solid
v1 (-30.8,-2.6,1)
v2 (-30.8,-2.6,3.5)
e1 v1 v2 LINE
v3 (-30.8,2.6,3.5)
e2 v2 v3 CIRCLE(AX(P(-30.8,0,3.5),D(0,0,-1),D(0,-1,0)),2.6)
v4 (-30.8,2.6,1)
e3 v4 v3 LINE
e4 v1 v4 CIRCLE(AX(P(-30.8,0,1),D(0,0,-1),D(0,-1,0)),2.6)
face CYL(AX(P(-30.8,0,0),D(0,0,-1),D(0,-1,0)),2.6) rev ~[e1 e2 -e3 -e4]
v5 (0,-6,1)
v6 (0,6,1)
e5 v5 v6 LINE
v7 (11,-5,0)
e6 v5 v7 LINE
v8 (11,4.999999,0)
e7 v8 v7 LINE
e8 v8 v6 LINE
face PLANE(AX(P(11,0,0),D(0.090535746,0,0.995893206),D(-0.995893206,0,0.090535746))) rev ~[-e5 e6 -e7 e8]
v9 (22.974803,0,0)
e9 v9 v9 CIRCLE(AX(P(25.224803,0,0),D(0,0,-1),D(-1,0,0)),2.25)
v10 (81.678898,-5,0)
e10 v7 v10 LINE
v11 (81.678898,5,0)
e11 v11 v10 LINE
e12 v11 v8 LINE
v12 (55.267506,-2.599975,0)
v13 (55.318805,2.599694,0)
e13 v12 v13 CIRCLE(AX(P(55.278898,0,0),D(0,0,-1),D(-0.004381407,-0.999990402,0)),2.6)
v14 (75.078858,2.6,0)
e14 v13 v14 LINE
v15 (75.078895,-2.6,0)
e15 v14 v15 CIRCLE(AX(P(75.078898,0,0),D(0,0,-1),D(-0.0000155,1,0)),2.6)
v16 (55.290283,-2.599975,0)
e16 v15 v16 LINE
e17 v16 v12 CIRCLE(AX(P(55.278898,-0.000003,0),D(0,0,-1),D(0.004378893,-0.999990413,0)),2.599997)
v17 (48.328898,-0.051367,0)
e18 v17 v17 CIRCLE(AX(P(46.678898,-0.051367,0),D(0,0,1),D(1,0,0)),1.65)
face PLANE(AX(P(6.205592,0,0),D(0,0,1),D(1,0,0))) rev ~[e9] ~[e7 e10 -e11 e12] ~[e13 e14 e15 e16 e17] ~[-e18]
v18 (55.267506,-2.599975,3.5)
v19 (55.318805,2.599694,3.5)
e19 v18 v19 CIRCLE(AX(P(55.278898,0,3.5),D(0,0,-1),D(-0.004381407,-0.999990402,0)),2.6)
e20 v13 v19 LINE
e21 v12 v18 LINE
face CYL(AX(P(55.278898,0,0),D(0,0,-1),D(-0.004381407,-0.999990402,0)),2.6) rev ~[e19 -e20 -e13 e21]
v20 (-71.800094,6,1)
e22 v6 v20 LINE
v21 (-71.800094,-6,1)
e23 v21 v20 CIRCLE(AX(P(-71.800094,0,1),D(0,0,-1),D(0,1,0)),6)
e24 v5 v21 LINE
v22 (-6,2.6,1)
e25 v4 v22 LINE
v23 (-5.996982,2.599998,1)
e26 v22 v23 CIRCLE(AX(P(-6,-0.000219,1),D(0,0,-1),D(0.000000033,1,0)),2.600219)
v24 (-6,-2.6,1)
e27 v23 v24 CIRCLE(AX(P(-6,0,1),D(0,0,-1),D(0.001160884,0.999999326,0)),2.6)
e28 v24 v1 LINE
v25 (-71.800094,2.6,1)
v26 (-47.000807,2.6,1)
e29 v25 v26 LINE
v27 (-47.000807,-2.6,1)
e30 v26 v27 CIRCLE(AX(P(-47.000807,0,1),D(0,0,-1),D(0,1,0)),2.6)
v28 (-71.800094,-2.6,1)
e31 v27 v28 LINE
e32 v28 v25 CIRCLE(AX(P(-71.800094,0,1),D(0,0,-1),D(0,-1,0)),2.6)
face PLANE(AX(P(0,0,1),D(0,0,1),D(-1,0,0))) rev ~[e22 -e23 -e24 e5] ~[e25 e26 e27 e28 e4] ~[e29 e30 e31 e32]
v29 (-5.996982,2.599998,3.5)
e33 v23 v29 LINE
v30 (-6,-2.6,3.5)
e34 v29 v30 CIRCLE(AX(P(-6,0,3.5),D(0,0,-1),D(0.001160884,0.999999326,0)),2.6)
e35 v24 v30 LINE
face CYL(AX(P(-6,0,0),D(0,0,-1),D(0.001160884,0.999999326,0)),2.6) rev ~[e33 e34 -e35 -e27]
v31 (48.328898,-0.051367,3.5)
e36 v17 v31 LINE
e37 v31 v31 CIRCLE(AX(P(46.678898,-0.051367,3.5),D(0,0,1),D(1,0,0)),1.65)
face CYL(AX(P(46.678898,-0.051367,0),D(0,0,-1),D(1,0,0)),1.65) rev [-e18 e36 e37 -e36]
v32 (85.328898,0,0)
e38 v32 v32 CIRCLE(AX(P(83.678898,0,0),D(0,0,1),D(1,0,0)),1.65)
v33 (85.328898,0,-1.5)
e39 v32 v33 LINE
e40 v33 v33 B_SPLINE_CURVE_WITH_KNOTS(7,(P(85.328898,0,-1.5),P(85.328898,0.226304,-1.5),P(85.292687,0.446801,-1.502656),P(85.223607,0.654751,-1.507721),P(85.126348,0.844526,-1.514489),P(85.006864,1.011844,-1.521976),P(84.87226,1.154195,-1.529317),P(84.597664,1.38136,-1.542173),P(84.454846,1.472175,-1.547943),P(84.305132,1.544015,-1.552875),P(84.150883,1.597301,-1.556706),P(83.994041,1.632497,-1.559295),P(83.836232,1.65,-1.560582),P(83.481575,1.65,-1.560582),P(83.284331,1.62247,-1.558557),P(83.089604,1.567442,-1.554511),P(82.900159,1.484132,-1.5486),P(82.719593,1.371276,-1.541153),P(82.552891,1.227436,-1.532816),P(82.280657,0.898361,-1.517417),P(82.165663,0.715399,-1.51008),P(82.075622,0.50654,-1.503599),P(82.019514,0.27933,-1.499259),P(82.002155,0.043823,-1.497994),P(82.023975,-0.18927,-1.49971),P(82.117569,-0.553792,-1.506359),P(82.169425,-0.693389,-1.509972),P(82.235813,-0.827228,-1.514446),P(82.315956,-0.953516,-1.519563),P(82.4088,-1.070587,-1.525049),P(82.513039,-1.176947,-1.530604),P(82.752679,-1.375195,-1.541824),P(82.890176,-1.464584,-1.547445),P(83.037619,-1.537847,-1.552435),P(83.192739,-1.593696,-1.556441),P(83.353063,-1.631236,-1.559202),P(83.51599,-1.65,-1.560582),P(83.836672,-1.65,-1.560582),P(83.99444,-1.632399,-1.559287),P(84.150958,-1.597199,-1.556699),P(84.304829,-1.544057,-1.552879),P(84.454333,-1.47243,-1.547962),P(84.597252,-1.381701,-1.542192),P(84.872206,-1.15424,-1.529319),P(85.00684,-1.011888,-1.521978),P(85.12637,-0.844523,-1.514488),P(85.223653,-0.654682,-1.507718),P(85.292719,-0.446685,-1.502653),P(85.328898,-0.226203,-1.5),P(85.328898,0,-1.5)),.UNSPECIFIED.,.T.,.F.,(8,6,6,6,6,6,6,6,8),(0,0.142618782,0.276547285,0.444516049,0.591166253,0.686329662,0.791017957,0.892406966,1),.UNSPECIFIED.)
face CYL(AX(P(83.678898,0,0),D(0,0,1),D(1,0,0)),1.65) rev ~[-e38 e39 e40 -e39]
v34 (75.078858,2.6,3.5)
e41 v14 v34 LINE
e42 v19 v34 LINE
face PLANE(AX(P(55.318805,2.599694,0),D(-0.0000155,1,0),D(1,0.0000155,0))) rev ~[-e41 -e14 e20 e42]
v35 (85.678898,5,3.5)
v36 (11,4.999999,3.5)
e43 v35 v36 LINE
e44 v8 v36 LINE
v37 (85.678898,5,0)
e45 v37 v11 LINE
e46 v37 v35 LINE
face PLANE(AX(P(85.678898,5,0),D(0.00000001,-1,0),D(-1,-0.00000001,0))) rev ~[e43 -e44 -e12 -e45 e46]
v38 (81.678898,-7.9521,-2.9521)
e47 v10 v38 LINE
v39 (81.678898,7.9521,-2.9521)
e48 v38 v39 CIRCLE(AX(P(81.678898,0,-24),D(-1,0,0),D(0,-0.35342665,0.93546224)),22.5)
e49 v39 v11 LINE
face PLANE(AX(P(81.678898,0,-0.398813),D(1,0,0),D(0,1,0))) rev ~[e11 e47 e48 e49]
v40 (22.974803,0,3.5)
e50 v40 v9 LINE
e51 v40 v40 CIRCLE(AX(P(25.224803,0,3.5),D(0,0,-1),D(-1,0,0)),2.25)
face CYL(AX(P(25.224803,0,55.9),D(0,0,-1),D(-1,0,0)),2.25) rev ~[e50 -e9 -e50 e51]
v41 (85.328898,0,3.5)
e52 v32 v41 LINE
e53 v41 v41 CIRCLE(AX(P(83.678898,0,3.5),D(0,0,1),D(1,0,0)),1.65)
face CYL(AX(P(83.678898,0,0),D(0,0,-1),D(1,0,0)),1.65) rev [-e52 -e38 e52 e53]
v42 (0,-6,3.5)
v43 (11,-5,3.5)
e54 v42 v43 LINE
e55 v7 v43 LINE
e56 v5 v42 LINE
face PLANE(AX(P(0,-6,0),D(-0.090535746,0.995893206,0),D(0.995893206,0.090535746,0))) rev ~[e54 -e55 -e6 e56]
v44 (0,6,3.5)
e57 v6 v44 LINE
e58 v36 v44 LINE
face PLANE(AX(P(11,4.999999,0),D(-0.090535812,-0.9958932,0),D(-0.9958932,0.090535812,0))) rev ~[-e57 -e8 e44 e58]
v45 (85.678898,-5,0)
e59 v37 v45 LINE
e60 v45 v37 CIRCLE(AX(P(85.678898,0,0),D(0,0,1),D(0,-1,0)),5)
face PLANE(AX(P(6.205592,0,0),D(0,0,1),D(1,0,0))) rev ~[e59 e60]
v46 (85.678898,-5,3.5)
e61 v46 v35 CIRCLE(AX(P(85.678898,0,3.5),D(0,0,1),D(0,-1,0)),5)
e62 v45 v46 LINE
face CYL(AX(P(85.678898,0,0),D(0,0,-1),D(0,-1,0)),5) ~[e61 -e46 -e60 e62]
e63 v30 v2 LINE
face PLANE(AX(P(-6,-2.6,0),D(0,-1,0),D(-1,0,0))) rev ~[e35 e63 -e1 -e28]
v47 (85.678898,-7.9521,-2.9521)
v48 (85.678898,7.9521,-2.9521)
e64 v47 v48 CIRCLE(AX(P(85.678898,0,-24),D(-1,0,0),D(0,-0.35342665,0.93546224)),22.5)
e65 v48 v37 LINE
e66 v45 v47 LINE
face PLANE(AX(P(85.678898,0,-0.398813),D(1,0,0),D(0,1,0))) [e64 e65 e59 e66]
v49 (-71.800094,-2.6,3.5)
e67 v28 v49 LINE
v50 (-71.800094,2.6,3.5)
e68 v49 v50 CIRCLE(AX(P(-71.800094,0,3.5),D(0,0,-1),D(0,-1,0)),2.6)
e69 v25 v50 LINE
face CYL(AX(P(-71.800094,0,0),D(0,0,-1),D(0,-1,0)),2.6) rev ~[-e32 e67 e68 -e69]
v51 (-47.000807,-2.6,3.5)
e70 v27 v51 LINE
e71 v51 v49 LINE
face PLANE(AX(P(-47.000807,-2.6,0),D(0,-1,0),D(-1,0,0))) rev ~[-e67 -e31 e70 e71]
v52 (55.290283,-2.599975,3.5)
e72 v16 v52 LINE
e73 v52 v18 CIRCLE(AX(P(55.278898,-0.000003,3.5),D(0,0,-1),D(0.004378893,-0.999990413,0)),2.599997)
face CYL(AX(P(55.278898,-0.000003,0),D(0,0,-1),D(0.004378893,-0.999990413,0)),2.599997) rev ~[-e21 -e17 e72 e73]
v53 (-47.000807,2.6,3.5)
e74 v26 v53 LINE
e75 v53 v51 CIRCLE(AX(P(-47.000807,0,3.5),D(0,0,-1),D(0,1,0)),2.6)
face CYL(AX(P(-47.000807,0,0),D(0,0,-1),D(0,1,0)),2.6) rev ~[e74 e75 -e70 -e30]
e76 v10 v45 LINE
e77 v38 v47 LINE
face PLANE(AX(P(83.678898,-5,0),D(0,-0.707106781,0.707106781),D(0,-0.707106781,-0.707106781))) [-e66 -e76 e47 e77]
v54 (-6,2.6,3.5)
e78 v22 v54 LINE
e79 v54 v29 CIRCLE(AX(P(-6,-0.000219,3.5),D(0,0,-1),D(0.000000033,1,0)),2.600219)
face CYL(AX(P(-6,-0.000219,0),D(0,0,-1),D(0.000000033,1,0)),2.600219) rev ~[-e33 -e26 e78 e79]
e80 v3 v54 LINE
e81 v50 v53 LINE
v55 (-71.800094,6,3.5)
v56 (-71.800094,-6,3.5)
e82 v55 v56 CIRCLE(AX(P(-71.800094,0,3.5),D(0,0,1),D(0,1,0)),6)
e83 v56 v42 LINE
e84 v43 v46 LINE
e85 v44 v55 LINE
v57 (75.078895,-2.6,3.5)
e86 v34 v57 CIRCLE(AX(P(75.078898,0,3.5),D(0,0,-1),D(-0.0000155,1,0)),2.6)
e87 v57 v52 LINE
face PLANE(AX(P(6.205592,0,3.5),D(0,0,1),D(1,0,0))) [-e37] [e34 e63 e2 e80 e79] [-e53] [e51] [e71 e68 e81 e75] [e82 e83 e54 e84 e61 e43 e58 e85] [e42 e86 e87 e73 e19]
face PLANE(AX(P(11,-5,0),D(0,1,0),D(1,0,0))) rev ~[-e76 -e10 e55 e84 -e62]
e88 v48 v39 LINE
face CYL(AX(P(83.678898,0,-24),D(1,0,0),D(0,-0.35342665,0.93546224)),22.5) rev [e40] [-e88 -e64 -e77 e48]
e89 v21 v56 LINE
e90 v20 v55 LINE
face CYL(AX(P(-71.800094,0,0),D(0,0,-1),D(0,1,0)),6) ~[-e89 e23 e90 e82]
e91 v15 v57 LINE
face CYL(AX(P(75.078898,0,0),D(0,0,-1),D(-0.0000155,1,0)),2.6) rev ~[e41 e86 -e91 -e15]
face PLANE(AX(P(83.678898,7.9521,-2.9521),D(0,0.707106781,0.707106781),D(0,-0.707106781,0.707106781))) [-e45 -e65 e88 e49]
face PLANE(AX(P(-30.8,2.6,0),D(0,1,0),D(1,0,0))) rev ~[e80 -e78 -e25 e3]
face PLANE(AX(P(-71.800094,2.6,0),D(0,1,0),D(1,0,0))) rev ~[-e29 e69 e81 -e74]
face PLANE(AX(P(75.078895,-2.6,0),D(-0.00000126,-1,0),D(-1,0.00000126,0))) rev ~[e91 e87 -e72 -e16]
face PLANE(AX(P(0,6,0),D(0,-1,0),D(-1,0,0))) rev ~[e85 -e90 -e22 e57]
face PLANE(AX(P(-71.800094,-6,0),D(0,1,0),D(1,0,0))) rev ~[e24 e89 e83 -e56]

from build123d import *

# Parameters (mm, degrees)
F0_R      = 1.65
F1_DEPTH  = 3.5
F3_DEPTH  = 6
F6_DEPTH  = 2
F9_DEPTH  = 1.75
F11_D     = 4.5
F11_DEPTH = 52.4
F11_TIP   = 1.3519363928


# Not quite as in the source:
# - a feature names something its author has since deleted; it is built from what else it names


with BuildPart() as f1:
    # F0 (on Top) → F1 (new body)
    with BuildSketch(Plane.XY):
        with BuildLine():
            Line((0, 6), (-71.8000936901, 6))
            ThreePointArc((-71.8000936901, 6), (-77.8000936901, 0), (-71.8000936901, -6))
            Line((-71.8000936901, -6), (0, -6))
            Line((0, -6), (11, -5))
            Line((11, -5), (85.6788979987, -5))
            ThreePointArc((85.6788979733, -4.9999999898), (90.6788979733, 3.56e-08), (85.6788979225, 5.0000000102))
            Line((85.6788979479, 5.0000000203), (11, 4.9999992617))
            Line((11, 4.9999992617), (0, 6))
        make_face()
        with Locations((46.6788982548, -0.0513669582)):
            Circle(F0_R, mode=Mode.SUBTRACT)
        with BuildLine():
            ThreePointArc((75.0788576977, 2.5999999997), (77.6788979986, 1.85129e-05), (75.0788947235, -2.6))
            Line((75.0788947235, -2.6), (55.290283107, -2.5999750728))
            ThreePointArc((55.290283107, -2.5999750728), (55.2788947235, -2.6), (55.2675063401, -2.5999750441))
            ThreePointArc((55.2675063401, -2.5999750441), (52.6790245248, 0.02564995), (55.3188054687, 2.5996937115))
            Line((55.3188054687, 2.5996937115), (75.0788576977, 2.5999999997))
        make_face(mode=Mode.SUBTRACT)
        with BuildLine():
            ThreePointArc((-71.8000936901, -2.6), (-74.4000936901, 0), (-71.8000936901, 2.6))
            Line((-71.8000936901, 2.6), (-47.0008072172, 2.6))
            ThreePointArc((-47.0008072172, 2.6), (-44.4008072172, 0), (-47.0008072172, -2.6))
            Line((-47.0008072172, -2.6), (-71.8000936901, -2.6))
        make_face(mode=Mode.SUBTRACT)
        with BuildLine():
            ThreePointArc((-30.8000002499, -2.6), (-33.4000002499, 0), (-30.8000002499, 2.6))
            Line((-30.8000002499, 2.6), (-6.00000025, 2.6))
            ThreePointArc((-6.00000025, 2.6), (-5.9984911006, 2.599999562), (-5.9969819517, 2.5999982481))
            ThreePointArc((-5.9969819517, 2.5999982481), (-3.400000688, -0.0015091494), (-6.00000025, -2.6))
            Line((-6.00000025, -2.6), (-30.8000002499, -2.6))
        make_face(mode=Mode.SUBTRACT)
        with Locations((83.6788979987, 0)):
            Circle(F0_R, mode=Mode.SUBTRACT)
    extrude(amount=F1_DEPTH)

    # F2 (on Front) → F3 (cut, symmetric)
    with BuildSketch(Plane.XZ):
        Polygon((-80.4351404223, 1), (-80.4351404223, 0), (11, 0), (0, 1), align=None)
    extrude(amount=F3_DEPTH, both=True, mode=Mode.SUBTRACT)

    # F5 (on face) → F6 (join, symmetric)
    with BuildSketch(Plane.YZ.offset(83.6788979987)):
        Polygon((-5.7500000356, -0.75), (5.7500000356, -0.75), (5.0000000356, 0), (-5.0000000356, 0), align=None)
        with BuildLine():
            ThreePointArc((-7.9520996302, -2.9520995947), (0, -1.5), (7.9520996302, -2.9520995946))
            Line((7.9520996302, -2.9520995946), (5.7500000356, -0.75))
            Line((5.7500000356, -0.75), (-5.7500000356, -0.75))
            Line((-5.7500000356, -0.75), (-7.9520996302, -2.9520995946))
        make_face()
    extrude(amount=F6_DEPTH, both=True)

    # F9 (cut): a face of the model
    f9_faces = [f1.faces().sort_by_distance(p)[0] for p in [
        (83.6788979987, 0, 0),
    ]]
    extrude(f9_faces, amount=-F9_DEPTH, mode=Mode.SUBTRACT)

    # F11
    with Locations(Plane.XY.offset(3.5)):
        with Locations((25.2248030156, 0)):
            Hole(F11_D / 2, depth=F11_DEPTH)
            with Locations((0, 0, -(F11_DEPTH + F11_TIP / 2))):  # 118° drill point
                Cone(0, F11_D / 2, F11_TIP, mode=Mode.SUBTRACT)


solid = f1.part
